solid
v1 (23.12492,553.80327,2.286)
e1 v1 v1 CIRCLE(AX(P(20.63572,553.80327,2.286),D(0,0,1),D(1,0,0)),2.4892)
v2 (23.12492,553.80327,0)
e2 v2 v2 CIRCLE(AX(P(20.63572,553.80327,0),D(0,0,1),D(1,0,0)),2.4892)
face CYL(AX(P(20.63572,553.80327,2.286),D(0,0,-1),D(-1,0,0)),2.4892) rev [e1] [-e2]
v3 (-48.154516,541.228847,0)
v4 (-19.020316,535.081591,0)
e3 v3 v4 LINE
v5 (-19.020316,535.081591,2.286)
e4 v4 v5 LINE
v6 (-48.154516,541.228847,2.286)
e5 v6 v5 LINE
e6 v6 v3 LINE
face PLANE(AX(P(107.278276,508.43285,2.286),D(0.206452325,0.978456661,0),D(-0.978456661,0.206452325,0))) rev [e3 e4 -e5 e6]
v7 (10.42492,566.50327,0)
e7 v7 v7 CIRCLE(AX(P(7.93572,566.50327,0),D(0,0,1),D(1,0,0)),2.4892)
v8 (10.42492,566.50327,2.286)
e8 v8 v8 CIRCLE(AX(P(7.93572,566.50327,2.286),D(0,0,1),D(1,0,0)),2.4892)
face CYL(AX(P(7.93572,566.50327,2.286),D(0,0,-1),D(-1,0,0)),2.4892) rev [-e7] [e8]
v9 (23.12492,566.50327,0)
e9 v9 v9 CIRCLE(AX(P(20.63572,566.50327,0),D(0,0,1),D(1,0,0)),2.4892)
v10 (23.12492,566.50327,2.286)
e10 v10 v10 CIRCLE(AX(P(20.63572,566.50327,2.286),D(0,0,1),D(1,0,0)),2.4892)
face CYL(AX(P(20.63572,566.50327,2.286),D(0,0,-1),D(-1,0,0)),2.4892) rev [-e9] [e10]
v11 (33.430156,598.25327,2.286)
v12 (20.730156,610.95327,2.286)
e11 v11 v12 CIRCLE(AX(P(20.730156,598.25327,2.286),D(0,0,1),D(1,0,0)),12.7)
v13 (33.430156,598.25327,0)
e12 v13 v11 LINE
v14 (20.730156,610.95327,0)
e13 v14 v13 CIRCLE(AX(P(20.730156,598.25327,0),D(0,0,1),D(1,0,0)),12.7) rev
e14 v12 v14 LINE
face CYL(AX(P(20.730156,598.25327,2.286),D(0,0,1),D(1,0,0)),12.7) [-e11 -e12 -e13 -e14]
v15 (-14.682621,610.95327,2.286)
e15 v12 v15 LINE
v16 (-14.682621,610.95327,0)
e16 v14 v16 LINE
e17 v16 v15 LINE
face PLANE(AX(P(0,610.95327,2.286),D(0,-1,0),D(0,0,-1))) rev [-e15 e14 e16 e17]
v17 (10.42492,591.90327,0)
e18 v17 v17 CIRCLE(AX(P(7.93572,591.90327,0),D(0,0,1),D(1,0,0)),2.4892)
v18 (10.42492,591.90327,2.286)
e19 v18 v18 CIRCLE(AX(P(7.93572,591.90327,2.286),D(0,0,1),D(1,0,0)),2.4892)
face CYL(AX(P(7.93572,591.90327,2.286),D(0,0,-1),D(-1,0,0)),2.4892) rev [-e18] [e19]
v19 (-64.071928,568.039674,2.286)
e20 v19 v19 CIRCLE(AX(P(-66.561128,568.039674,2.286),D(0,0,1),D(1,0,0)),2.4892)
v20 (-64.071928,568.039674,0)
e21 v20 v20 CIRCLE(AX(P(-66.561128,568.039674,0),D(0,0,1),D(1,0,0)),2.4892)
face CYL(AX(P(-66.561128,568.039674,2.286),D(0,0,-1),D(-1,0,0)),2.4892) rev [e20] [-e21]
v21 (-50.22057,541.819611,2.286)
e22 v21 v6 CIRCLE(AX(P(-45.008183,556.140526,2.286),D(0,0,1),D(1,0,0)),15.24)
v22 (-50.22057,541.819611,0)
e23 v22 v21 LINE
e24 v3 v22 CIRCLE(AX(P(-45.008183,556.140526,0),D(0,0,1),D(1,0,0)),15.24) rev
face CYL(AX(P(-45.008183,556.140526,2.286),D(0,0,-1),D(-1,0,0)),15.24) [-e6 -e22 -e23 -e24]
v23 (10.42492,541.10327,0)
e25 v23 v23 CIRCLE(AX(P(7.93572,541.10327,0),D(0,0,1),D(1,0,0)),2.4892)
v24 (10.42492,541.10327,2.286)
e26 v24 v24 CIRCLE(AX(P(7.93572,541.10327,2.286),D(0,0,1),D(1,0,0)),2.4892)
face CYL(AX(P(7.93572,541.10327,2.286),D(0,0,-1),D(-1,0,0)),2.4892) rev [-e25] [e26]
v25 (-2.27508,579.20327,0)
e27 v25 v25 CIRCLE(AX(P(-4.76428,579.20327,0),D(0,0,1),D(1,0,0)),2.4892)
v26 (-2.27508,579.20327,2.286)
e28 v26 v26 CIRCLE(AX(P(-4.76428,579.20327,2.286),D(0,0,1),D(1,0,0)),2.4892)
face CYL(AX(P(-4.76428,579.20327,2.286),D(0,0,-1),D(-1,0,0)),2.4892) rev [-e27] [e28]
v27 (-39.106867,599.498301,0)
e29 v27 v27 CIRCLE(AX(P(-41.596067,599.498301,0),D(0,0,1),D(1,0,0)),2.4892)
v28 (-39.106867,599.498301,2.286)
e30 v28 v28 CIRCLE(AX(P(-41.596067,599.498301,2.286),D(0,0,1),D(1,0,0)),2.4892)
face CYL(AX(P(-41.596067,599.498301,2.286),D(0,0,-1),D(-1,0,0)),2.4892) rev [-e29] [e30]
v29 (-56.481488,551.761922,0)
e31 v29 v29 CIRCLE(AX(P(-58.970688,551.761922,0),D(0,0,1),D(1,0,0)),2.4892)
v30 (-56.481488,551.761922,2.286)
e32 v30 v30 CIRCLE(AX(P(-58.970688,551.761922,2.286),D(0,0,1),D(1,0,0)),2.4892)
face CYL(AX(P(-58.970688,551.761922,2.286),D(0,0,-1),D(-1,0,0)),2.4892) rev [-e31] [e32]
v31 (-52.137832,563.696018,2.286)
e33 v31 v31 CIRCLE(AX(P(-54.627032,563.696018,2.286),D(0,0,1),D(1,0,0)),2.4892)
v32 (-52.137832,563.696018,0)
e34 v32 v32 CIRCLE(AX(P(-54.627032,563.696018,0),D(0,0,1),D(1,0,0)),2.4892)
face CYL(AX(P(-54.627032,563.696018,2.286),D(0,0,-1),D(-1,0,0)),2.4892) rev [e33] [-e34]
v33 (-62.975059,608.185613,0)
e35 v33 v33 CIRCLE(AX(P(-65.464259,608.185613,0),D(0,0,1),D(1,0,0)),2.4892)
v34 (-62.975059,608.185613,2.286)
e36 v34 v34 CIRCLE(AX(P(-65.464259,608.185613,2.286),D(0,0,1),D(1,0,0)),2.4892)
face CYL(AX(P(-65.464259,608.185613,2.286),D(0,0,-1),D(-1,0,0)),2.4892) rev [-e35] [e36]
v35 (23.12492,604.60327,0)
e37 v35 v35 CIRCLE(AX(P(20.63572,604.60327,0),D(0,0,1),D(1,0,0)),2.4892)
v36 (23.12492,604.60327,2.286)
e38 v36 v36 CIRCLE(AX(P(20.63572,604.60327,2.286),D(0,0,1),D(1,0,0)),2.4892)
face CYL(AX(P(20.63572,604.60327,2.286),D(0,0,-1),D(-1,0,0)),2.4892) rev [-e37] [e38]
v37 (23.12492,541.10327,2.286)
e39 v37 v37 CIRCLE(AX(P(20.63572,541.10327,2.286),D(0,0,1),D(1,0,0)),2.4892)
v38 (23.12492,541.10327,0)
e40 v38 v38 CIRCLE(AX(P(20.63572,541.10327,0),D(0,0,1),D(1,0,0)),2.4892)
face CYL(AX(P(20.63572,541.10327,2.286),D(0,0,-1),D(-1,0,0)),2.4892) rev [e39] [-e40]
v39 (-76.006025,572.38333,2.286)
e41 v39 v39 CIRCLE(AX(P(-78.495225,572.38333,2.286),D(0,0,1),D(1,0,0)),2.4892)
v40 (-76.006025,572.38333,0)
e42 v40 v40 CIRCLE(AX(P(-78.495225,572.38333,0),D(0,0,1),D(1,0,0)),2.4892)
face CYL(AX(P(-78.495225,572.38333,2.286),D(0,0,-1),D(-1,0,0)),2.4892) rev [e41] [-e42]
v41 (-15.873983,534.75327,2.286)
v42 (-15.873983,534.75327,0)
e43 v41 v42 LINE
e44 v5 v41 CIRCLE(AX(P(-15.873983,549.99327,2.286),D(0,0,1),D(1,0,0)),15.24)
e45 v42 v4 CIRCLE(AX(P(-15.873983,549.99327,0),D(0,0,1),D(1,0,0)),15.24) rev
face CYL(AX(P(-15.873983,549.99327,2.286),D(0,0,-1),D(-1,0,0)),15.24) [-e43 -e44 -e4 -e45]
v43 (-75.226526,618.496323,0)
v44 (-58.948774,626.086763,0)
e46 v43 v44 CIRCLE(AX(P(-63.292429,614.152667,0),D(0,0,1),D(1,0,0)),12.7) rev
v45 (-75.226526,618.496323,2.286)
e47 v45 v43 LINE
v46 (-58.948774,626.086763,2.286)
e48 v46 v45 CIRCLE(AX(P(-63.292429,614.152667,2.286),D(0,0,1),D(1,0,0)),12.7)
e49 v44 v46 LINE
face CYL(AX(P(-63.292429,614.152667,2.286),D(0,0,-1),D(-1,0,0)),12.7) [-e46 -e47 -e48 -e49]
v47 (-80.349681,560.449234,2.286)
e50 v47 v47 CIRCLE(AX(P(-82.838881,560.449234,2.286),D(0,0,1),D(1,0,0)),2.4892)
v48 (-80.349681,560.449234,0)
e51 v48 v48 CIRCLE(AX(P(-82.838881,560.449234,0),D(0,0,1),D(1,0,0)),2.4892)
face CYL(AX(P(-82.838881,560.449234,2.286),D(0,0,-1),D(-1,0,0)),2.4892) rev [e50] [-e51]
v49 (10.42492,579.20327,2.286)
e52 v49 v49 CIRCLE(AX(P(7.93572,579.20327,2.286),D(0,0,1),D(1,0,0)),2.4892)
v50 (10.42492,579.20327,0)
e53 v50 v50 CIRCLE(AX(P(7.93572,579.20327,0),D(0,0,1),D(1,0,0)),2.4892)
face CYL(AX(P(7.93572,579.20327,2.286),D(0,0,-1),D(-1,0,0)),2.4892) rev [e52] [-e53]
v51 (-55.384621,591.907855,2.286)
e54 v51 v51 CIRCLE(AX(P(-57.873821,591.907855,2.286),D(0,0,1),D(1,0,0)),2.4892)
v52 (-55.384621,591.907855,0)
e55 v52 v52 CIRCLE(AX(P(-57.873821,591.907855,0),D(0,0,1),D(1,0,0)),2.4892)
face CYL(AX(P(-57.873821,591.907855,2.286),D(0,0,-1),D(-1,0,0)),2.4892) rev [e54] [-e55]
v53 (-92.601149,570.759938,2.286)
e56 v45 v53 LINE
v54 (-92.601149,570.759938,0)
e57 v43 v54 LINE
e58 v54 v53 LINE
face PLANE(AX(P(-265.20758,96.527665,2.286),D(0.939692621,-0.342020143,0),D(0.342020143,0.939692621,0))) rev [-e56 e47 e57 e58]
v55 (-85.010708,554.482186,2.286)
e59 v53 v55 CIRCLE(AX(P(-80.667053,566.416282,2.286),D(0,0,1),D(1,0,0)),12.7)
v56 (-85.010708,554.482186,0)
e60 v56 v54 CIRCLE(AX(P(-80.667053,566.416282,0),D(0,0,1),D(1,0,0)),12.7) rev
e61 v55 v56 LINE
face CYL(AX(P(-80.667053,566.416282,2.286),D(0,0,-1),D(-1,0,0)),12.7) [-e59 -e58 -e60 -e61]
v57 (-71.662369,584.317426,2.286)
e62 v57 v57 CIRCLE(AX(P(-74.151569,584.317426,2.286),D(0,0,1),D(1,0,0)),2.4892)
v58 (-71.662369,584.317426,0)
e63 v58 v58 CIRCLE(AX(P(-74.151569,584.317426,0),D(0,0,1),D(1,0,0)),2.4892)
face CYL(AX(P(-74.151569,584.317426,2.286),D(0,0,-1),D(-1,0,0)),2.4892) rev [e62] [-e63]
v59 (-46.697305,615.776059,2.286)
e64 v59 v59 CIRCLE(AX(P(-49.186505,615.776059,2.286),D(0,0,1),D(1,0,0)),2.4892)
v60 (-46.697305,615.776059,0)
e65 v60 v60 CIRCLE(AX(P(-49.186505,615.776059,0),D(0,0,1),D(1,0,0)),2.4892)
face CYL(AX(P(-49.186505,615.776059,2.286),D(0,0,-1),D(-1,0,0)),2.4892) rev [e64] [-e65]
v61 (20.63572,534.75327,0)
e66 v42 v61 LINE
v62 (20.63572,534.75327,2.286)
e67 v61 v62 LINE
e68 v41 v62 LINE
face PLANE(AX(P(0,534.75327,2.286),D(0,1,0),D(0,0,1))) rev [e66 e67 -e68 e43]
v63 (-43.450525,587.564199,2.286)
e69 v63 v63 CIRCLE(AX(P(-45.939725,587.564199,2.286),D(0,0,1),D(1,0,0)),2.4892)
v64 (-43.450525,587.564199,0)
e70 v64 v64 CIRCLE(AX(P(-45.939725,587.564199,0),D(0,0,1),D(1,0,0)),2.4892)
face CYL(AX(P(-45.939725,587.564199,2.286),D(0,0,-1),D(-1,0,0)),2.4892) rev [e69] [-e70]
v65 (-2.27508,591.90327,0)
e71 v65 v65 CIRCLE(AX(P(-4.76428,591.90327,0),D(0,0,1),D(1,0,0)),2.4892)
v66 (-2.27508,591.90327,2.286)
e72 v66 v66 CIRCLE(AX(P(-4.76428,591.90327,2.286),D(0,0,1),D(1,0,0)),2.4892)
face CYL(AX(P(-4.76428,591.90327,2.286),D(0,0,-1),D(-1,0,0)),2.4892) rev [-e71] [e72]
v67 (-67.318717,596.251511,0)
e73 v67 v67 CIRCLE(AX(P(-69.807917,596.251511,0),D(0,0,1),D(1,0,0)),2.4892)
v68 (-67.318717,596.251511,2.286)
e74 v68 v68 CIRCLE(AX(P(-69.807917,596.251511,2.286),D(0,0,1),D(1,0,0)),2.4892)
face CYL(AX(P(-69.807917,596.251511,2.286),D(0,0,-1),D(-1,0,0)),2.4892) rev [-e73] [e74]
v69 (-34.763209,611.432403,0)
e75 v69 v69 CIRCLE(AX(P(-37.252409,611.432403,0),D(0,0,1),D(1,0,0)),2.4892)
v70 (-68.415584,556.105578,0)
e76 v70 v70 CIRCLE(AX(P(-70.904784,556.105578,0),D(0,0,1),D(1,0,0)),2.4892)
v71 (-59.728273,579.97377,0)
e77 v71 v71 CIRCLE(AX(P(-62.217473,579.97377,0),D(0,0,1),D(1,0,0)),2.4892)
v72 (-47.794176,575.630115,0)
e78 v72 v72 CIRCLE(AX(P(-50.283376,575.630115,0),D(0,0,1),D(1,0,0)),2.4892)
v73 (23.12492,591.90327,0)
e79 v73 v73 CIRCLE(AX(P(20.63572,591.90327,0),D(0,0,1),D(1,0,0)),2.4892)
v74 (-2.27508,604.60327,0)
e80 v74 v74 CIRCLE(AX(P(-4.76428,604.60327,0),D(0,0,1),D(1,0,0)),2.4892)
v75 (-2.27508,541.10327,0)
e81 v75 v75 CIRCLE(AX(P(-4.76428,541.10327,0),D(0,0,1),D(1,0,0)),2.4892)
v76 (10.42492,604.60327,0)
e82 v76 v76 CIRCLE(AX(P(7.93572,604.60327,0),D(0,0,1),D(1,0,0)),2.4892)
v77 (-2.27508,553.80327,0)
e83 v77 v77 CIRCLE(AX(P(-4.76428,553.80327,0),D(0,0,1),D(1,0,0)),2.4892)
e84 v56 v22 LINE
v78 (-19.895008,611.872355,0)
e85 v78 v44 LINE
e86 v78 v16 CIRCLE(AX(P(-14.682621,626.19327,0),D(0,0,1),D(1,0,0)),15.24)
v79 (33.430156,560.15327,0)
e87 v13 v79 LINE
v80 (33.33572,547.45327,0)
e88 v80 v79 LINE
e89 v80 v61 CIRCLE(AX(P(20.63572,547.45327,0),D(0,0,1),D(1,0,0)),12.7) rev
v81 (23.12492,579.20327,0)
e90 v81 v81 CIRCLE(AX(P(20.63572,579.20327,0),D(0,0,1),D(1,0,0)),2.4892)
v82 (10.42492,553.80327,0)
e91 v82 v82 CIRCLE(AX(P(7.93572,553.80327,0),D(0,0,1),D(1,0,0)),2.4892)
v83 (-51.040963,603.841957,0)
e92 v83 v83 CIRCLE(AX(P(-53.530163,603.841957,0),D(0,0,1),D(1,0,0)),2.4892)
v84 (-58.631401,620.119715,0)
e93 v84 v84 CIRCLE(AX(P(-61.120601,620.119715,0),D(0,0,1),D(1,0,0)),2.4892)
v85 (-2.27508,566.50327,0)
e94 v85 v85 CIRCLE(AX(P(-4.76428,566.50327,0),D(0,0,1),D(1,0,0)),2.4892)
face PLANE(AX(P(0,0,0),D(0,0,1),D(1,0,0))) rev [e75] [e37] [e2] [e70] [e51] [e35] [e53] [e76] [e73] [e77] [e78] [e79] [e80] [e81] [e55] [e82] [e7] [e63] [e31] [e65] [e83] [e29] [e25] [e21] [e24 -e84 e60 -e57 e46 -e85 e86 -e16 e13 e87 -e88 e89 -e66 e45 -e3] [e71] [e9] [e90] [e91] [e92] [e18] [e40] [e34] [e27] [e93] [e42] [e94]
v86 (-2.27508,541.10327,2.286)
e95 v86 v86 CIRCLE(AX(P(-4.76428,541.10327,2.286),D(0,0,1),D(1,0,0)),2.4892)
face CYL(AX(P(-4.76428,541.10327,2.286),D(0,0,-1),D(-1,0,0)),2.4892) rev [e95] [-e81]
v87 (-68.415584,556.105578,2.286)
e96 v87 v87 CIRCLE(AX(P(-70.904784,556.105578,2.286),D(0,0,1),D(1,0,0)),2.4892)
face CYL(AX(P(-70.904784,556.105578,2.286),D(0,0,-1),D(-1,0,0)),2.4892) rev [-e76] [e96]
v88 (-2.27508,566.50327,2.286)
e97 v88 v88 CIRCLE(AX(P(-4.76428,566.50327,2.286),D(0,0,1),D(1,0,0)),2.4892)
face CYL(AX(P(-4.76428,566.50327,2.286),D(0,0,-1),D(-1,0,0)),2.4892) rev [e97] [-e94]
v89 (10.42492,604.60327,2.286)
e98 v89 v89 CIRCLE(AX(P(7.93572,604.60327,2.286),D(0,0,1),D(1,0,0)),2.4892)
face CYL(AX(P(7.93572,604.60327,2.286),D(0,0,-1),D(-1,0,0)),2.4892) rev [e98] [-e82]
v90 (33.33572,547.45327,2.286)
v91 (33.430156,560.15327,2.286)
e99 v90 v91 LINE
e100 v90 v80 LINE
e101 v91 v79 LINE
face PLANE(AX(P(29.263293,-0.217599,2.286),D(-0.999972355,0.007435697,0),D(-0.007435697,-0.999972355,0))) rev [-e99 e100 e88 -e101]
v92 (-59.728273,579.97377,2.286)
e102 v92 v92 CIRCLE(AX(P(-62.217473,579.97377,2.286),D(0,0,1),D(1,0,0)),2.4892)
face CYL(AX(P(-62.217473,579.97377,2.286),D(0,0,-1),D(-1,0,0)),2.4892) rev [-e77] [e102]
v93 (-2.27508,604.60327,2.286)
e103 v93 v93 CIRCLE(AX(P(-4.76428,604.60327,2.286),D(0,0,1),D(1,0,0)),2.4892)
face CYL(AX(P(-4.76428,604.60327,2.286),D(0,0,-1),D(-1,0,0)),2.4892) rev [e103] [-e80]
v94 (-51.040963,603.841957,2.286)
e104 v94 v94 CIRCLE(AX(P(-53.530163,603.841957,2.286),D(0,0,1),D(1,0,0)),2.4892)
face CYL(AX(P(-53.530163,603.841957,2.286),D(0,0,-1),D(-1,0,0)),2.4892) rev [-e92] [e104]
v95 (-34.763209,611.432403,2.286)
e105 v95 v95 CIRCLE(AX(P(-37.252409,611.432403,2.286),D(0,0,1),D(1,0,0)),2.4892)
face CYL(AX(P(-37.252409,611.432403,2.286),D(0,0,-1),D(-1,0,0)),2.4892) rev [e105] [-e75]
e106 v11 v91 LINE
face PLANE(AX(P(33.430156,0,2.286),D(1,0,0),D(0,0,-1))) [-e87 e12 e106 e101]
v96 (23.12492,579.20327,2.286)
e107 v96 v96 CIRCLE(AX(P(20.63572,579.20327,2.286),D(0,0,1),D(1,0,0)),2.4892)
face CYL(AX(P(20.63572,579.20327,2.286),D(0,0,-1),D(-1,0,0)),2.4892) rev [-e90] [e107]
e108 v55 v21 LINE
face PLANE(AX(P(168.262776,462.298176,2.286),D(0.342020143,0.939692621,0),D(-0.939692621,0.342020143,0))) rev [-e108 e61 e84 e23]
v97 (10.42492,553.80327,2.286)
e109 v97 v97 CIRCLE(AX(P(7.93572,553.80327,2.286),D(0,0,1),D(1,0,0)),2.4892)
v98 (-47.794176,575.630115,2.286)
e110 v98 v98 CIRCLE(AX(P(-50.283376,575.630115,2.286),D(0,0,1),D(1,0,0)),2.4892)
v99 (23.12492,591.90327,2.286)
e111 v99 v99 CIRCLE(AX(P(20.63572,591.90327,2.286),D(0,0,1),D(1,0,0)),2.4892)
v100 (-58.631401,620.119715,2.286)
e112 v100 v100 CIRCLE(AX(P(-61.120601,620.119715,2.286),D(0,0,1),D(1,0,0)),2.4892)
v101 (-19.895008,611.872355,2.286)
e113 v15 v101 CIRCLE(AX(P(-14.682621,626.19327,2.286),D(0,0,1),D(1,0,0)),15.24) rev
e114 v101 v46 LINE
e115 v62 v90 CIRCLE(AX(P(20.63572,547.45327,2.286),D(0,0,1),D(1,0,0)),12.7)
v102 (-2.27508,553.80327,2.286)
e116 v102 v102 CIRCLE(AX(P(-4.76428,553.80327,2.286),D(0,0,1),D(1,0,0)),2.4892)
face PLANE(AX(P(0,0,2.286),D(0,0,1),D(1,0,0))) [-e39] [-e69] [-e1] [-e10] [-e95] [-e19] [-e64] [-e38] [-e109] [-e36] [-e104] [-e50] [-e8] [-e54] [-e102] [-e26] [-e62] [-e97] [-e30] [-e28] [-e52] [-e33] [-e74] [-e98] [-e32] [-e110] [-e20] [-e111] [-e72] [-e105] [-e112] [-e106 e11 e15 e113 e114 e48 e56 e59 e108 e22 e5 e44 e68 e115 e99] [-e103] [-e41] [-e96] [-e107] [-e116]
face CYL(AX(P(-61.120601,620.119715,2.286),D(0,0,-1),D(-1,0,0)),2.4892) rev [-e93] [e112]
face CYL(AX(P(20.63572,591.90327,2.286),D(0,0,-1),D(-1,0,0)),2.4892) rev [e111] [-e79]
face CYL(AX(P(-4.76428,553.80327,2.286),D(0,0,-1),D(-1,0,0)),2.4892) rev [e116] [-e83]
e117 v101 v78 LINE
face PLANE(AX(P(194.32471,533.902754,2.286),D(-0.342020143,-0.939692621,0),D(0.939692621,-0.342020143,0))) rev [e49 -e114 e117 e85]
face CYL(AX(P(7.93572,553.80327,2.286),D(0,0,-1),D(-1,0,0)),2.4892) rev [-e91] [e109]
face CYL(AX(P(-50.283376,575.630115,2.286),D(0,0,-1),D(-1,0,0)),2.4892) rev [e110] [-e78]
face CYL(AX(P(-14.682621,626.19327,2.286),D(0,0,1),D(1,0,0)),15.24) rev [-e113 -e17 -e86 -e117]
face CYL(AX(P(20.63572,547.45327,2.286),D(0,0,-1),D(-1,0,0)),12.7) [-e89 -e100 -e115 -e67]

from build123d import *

# Parameters (mm, degrees)
SKETCH2_R           = 2.4892
SKETCH2_R_2         = 2.489199995
SKETCH2_R_3         = 2.489199998
BOSS_EXTRUDE1_DEPTH = 2.286
FILLET6_R           = 12.7
FILLET7_R           = 15.24


with BuildPart() as part:
    # Sketch2 → Boss-Extrude1 (new body)
    with BuildSketch(Plane.XY):
        Polygon((33.430156219, 560.153270419), (33.430156219, 610.953270419), (-17.369843781, 610.953270419), (-70.882869838, 630.430419049), (-92.601148921, 570.759937623), (-96.944804753, 558.825841343), (-49.208419617, 541.451218062), (-17.464279743, 534.753270419), (33.335720257, 534.753270419), (33.335720257, 547.453270419), align=None)
        with Locations((-4.764279743, 566.503270419)):
            Circle(SKETCH2_R, mode=Mode.SUBTRACT)
        with Locations((-4.764279743, 579.203270419)):
            Circle(SKETCH2_R, mode=Mode.SUBTRACT)
        with Locations((7.935720257, 566.503270419)):
            Circle(SKETCH2_R, mode=Mode.SUBTRACT)
        with Locations((20.635720257, 566.503270419)):
            Circle(SKETCH2_R, mode=Mode.SUBTRACT)
        with Locations((7.935720257, 579.203270419)):
            Circle(SKETCH2_R, mode=Mode.SUBTRACT)
        with Locations((20.635720257, 579.203270419)):
            Circle(SKETCH2_R, mode=Mode.SUBTRACT)
        with Locations((-4.764279743, 591.903270419)):
            Circle(SKETCH2_R, mode=Mode.SUBTRACT)
        with Locations((-4.764279743, 604.603270419)):
            Circle(SKETCH2_R, mode=Mode.SUBTRACT)
        with Locations((7.935720257, 591.903270419)):
            Circle(SKETCH2_R, mode=Mode.SUBTRACT)
        with Locations((20.635720257, 591.903270419)):
            Circle(SKETCH2_R, mode=Mode.SUBTRACT)
        with Locations((7.935720257, 604.603270419)):
            Circle(SKETCH2_R, mode=Mode.SUBTRACT)
        with Locations((20.635720257, 604.603270419)):
            Circle(SKETCH2_R, mode=Mode.SUBTRACT)
        with Locations((20.635720257, 553.803270419)):
            Circle(SKETCH2_R, mode=Mode.SUBTRACT)
        with Locations((-4.764279743, 553.803270419)):
            Circle(SKETCH2_R, mode=Mode.SUBTRACT)
        with Locations((7.935720257, 553.803270419)):
            Circle(SKETCH2_R, mode=Mode.SUBTRACT)
        with Locations((20.635720257, 541.103270419)):
            Circle(SKETCH2_R, mode=Mode.SUBTRACT)
        with Locations((7.935720257, 541.103270419)):
            Circle(SKETCH2_R, mode=Mode.SUBTRACT)
        with Locations((-4.764279743, 541.103270419)):
            Circle(SKETCH2_R, mode=Mode.SUBTRACT)
        with Locations((-37.25240889, 611.432403444)):
            Circle(SKETCH2_R, mode=Mode.SUBTRACT)
        with Locations((-50.283376351, 575.630114592)):
            Circle(SKETCH2_R, mode=Mode.SUBTRACT)
        with Locations((-62.217472635, 579.973770413)):
            Circle(SKETCH2_R, mode=Mode.SUBTRACT)
        with Locations((-74.151568919, 584.317426233)):
            Circle(SKETCH2_R, mode=Mode.SUBTRACT)
        with Locations((-69.80791745, 596.251510539)):
            Circle(SKETCH2_R_2, mode=Mode.SUBTRACT)
        with Locations((-45.93972488, 587.564198905)):
            Circle(SKETCH2_R_2, mode=Mode.SUBTRACT)
        with Locations((-57.873821165, 591.907854722)):
            Circle(SKETCH2_R_2, mode=Mode.SUBTRACT)
        with Locations((-53.530163169, 603.841956995)):
            Circle(SKETCH2_R_3, mode=Mode.SUBTRACT)
        with Locations((-41.596066884, 599.498301178)):
            Circle(SKETCH2_R_3, mode=Mode.SUBTRACT)
        with Locations((-65.464259454, 608.185612812)):
            Circle(SKETCH2_R_3, mode=Mode.SUBTRACT)
        with Locations((-61.120601458, 620.119715085)):
            Circle(SKETCH2_R, mode=Mode.SUBTRACT)
        with Locations((-49.186505174, 615.776059265)):
            Circle(SKETCH2_R, mode=Mode.SUBTRACT)
        with Locations((-78.495224739, 572.383329949)):
            Circle(SKETCH2_R, mode=Mode.SUBTRACT)
        with Locations((-54.627032171, 563.696018308)):
            Circle(SKETCH2_R, mode=Mode.SUBTRACT)
        with Locations((-66.561128455, 568.039674129)):
            Circle(SKETCH2_R, mode=Mode.SUBTRACT)
        with Locations((-58.970687991, 551.761922025)):
            Circle(SKETCH2_R, mode=Mode.SUBTRACT)
        with Locations((-82.838880559, 560.449233665)):
            Circle(SKETCH2_R, mode=Mode.SUBTRACT)
        with Locations((-70.904784275, 556.105577845)):
            Circle(SKETCH2_R, mode=Mode.SUBTRACT)
    extrude(amount=BOSS_EXTRUDE1_DEPTH)

    # Fillet6
    fillet6_edges = [part.edges().sort_by_distance(p)[0] for p in [
        (-70.882869838, 630.430419049, 1.143),
        (-96.944804753, 558.825841343, 1.143),
        (33.430156219, 610.953270419, 1.143),
        (33.335720257, 534.753270419, 1.143),
    ]]
    fillet(fillet6_edges, radius=FILLET6_R - 0.0001)  # a hair under: the kernel refuses the full size

    # Fillet7
    fillet7_edges = [part.edges().sort_by_distance(p)[0] for p in [
        (-17.464279743, 534.753270419, 1.143),
        (-49.208419617, 541.451218062, 1.143),
        (-17.369843781, 610.953270419, 1.143),
    ]]
    fillet(fillet7_edges, radius=FILLET7_R)


solid = part.part
